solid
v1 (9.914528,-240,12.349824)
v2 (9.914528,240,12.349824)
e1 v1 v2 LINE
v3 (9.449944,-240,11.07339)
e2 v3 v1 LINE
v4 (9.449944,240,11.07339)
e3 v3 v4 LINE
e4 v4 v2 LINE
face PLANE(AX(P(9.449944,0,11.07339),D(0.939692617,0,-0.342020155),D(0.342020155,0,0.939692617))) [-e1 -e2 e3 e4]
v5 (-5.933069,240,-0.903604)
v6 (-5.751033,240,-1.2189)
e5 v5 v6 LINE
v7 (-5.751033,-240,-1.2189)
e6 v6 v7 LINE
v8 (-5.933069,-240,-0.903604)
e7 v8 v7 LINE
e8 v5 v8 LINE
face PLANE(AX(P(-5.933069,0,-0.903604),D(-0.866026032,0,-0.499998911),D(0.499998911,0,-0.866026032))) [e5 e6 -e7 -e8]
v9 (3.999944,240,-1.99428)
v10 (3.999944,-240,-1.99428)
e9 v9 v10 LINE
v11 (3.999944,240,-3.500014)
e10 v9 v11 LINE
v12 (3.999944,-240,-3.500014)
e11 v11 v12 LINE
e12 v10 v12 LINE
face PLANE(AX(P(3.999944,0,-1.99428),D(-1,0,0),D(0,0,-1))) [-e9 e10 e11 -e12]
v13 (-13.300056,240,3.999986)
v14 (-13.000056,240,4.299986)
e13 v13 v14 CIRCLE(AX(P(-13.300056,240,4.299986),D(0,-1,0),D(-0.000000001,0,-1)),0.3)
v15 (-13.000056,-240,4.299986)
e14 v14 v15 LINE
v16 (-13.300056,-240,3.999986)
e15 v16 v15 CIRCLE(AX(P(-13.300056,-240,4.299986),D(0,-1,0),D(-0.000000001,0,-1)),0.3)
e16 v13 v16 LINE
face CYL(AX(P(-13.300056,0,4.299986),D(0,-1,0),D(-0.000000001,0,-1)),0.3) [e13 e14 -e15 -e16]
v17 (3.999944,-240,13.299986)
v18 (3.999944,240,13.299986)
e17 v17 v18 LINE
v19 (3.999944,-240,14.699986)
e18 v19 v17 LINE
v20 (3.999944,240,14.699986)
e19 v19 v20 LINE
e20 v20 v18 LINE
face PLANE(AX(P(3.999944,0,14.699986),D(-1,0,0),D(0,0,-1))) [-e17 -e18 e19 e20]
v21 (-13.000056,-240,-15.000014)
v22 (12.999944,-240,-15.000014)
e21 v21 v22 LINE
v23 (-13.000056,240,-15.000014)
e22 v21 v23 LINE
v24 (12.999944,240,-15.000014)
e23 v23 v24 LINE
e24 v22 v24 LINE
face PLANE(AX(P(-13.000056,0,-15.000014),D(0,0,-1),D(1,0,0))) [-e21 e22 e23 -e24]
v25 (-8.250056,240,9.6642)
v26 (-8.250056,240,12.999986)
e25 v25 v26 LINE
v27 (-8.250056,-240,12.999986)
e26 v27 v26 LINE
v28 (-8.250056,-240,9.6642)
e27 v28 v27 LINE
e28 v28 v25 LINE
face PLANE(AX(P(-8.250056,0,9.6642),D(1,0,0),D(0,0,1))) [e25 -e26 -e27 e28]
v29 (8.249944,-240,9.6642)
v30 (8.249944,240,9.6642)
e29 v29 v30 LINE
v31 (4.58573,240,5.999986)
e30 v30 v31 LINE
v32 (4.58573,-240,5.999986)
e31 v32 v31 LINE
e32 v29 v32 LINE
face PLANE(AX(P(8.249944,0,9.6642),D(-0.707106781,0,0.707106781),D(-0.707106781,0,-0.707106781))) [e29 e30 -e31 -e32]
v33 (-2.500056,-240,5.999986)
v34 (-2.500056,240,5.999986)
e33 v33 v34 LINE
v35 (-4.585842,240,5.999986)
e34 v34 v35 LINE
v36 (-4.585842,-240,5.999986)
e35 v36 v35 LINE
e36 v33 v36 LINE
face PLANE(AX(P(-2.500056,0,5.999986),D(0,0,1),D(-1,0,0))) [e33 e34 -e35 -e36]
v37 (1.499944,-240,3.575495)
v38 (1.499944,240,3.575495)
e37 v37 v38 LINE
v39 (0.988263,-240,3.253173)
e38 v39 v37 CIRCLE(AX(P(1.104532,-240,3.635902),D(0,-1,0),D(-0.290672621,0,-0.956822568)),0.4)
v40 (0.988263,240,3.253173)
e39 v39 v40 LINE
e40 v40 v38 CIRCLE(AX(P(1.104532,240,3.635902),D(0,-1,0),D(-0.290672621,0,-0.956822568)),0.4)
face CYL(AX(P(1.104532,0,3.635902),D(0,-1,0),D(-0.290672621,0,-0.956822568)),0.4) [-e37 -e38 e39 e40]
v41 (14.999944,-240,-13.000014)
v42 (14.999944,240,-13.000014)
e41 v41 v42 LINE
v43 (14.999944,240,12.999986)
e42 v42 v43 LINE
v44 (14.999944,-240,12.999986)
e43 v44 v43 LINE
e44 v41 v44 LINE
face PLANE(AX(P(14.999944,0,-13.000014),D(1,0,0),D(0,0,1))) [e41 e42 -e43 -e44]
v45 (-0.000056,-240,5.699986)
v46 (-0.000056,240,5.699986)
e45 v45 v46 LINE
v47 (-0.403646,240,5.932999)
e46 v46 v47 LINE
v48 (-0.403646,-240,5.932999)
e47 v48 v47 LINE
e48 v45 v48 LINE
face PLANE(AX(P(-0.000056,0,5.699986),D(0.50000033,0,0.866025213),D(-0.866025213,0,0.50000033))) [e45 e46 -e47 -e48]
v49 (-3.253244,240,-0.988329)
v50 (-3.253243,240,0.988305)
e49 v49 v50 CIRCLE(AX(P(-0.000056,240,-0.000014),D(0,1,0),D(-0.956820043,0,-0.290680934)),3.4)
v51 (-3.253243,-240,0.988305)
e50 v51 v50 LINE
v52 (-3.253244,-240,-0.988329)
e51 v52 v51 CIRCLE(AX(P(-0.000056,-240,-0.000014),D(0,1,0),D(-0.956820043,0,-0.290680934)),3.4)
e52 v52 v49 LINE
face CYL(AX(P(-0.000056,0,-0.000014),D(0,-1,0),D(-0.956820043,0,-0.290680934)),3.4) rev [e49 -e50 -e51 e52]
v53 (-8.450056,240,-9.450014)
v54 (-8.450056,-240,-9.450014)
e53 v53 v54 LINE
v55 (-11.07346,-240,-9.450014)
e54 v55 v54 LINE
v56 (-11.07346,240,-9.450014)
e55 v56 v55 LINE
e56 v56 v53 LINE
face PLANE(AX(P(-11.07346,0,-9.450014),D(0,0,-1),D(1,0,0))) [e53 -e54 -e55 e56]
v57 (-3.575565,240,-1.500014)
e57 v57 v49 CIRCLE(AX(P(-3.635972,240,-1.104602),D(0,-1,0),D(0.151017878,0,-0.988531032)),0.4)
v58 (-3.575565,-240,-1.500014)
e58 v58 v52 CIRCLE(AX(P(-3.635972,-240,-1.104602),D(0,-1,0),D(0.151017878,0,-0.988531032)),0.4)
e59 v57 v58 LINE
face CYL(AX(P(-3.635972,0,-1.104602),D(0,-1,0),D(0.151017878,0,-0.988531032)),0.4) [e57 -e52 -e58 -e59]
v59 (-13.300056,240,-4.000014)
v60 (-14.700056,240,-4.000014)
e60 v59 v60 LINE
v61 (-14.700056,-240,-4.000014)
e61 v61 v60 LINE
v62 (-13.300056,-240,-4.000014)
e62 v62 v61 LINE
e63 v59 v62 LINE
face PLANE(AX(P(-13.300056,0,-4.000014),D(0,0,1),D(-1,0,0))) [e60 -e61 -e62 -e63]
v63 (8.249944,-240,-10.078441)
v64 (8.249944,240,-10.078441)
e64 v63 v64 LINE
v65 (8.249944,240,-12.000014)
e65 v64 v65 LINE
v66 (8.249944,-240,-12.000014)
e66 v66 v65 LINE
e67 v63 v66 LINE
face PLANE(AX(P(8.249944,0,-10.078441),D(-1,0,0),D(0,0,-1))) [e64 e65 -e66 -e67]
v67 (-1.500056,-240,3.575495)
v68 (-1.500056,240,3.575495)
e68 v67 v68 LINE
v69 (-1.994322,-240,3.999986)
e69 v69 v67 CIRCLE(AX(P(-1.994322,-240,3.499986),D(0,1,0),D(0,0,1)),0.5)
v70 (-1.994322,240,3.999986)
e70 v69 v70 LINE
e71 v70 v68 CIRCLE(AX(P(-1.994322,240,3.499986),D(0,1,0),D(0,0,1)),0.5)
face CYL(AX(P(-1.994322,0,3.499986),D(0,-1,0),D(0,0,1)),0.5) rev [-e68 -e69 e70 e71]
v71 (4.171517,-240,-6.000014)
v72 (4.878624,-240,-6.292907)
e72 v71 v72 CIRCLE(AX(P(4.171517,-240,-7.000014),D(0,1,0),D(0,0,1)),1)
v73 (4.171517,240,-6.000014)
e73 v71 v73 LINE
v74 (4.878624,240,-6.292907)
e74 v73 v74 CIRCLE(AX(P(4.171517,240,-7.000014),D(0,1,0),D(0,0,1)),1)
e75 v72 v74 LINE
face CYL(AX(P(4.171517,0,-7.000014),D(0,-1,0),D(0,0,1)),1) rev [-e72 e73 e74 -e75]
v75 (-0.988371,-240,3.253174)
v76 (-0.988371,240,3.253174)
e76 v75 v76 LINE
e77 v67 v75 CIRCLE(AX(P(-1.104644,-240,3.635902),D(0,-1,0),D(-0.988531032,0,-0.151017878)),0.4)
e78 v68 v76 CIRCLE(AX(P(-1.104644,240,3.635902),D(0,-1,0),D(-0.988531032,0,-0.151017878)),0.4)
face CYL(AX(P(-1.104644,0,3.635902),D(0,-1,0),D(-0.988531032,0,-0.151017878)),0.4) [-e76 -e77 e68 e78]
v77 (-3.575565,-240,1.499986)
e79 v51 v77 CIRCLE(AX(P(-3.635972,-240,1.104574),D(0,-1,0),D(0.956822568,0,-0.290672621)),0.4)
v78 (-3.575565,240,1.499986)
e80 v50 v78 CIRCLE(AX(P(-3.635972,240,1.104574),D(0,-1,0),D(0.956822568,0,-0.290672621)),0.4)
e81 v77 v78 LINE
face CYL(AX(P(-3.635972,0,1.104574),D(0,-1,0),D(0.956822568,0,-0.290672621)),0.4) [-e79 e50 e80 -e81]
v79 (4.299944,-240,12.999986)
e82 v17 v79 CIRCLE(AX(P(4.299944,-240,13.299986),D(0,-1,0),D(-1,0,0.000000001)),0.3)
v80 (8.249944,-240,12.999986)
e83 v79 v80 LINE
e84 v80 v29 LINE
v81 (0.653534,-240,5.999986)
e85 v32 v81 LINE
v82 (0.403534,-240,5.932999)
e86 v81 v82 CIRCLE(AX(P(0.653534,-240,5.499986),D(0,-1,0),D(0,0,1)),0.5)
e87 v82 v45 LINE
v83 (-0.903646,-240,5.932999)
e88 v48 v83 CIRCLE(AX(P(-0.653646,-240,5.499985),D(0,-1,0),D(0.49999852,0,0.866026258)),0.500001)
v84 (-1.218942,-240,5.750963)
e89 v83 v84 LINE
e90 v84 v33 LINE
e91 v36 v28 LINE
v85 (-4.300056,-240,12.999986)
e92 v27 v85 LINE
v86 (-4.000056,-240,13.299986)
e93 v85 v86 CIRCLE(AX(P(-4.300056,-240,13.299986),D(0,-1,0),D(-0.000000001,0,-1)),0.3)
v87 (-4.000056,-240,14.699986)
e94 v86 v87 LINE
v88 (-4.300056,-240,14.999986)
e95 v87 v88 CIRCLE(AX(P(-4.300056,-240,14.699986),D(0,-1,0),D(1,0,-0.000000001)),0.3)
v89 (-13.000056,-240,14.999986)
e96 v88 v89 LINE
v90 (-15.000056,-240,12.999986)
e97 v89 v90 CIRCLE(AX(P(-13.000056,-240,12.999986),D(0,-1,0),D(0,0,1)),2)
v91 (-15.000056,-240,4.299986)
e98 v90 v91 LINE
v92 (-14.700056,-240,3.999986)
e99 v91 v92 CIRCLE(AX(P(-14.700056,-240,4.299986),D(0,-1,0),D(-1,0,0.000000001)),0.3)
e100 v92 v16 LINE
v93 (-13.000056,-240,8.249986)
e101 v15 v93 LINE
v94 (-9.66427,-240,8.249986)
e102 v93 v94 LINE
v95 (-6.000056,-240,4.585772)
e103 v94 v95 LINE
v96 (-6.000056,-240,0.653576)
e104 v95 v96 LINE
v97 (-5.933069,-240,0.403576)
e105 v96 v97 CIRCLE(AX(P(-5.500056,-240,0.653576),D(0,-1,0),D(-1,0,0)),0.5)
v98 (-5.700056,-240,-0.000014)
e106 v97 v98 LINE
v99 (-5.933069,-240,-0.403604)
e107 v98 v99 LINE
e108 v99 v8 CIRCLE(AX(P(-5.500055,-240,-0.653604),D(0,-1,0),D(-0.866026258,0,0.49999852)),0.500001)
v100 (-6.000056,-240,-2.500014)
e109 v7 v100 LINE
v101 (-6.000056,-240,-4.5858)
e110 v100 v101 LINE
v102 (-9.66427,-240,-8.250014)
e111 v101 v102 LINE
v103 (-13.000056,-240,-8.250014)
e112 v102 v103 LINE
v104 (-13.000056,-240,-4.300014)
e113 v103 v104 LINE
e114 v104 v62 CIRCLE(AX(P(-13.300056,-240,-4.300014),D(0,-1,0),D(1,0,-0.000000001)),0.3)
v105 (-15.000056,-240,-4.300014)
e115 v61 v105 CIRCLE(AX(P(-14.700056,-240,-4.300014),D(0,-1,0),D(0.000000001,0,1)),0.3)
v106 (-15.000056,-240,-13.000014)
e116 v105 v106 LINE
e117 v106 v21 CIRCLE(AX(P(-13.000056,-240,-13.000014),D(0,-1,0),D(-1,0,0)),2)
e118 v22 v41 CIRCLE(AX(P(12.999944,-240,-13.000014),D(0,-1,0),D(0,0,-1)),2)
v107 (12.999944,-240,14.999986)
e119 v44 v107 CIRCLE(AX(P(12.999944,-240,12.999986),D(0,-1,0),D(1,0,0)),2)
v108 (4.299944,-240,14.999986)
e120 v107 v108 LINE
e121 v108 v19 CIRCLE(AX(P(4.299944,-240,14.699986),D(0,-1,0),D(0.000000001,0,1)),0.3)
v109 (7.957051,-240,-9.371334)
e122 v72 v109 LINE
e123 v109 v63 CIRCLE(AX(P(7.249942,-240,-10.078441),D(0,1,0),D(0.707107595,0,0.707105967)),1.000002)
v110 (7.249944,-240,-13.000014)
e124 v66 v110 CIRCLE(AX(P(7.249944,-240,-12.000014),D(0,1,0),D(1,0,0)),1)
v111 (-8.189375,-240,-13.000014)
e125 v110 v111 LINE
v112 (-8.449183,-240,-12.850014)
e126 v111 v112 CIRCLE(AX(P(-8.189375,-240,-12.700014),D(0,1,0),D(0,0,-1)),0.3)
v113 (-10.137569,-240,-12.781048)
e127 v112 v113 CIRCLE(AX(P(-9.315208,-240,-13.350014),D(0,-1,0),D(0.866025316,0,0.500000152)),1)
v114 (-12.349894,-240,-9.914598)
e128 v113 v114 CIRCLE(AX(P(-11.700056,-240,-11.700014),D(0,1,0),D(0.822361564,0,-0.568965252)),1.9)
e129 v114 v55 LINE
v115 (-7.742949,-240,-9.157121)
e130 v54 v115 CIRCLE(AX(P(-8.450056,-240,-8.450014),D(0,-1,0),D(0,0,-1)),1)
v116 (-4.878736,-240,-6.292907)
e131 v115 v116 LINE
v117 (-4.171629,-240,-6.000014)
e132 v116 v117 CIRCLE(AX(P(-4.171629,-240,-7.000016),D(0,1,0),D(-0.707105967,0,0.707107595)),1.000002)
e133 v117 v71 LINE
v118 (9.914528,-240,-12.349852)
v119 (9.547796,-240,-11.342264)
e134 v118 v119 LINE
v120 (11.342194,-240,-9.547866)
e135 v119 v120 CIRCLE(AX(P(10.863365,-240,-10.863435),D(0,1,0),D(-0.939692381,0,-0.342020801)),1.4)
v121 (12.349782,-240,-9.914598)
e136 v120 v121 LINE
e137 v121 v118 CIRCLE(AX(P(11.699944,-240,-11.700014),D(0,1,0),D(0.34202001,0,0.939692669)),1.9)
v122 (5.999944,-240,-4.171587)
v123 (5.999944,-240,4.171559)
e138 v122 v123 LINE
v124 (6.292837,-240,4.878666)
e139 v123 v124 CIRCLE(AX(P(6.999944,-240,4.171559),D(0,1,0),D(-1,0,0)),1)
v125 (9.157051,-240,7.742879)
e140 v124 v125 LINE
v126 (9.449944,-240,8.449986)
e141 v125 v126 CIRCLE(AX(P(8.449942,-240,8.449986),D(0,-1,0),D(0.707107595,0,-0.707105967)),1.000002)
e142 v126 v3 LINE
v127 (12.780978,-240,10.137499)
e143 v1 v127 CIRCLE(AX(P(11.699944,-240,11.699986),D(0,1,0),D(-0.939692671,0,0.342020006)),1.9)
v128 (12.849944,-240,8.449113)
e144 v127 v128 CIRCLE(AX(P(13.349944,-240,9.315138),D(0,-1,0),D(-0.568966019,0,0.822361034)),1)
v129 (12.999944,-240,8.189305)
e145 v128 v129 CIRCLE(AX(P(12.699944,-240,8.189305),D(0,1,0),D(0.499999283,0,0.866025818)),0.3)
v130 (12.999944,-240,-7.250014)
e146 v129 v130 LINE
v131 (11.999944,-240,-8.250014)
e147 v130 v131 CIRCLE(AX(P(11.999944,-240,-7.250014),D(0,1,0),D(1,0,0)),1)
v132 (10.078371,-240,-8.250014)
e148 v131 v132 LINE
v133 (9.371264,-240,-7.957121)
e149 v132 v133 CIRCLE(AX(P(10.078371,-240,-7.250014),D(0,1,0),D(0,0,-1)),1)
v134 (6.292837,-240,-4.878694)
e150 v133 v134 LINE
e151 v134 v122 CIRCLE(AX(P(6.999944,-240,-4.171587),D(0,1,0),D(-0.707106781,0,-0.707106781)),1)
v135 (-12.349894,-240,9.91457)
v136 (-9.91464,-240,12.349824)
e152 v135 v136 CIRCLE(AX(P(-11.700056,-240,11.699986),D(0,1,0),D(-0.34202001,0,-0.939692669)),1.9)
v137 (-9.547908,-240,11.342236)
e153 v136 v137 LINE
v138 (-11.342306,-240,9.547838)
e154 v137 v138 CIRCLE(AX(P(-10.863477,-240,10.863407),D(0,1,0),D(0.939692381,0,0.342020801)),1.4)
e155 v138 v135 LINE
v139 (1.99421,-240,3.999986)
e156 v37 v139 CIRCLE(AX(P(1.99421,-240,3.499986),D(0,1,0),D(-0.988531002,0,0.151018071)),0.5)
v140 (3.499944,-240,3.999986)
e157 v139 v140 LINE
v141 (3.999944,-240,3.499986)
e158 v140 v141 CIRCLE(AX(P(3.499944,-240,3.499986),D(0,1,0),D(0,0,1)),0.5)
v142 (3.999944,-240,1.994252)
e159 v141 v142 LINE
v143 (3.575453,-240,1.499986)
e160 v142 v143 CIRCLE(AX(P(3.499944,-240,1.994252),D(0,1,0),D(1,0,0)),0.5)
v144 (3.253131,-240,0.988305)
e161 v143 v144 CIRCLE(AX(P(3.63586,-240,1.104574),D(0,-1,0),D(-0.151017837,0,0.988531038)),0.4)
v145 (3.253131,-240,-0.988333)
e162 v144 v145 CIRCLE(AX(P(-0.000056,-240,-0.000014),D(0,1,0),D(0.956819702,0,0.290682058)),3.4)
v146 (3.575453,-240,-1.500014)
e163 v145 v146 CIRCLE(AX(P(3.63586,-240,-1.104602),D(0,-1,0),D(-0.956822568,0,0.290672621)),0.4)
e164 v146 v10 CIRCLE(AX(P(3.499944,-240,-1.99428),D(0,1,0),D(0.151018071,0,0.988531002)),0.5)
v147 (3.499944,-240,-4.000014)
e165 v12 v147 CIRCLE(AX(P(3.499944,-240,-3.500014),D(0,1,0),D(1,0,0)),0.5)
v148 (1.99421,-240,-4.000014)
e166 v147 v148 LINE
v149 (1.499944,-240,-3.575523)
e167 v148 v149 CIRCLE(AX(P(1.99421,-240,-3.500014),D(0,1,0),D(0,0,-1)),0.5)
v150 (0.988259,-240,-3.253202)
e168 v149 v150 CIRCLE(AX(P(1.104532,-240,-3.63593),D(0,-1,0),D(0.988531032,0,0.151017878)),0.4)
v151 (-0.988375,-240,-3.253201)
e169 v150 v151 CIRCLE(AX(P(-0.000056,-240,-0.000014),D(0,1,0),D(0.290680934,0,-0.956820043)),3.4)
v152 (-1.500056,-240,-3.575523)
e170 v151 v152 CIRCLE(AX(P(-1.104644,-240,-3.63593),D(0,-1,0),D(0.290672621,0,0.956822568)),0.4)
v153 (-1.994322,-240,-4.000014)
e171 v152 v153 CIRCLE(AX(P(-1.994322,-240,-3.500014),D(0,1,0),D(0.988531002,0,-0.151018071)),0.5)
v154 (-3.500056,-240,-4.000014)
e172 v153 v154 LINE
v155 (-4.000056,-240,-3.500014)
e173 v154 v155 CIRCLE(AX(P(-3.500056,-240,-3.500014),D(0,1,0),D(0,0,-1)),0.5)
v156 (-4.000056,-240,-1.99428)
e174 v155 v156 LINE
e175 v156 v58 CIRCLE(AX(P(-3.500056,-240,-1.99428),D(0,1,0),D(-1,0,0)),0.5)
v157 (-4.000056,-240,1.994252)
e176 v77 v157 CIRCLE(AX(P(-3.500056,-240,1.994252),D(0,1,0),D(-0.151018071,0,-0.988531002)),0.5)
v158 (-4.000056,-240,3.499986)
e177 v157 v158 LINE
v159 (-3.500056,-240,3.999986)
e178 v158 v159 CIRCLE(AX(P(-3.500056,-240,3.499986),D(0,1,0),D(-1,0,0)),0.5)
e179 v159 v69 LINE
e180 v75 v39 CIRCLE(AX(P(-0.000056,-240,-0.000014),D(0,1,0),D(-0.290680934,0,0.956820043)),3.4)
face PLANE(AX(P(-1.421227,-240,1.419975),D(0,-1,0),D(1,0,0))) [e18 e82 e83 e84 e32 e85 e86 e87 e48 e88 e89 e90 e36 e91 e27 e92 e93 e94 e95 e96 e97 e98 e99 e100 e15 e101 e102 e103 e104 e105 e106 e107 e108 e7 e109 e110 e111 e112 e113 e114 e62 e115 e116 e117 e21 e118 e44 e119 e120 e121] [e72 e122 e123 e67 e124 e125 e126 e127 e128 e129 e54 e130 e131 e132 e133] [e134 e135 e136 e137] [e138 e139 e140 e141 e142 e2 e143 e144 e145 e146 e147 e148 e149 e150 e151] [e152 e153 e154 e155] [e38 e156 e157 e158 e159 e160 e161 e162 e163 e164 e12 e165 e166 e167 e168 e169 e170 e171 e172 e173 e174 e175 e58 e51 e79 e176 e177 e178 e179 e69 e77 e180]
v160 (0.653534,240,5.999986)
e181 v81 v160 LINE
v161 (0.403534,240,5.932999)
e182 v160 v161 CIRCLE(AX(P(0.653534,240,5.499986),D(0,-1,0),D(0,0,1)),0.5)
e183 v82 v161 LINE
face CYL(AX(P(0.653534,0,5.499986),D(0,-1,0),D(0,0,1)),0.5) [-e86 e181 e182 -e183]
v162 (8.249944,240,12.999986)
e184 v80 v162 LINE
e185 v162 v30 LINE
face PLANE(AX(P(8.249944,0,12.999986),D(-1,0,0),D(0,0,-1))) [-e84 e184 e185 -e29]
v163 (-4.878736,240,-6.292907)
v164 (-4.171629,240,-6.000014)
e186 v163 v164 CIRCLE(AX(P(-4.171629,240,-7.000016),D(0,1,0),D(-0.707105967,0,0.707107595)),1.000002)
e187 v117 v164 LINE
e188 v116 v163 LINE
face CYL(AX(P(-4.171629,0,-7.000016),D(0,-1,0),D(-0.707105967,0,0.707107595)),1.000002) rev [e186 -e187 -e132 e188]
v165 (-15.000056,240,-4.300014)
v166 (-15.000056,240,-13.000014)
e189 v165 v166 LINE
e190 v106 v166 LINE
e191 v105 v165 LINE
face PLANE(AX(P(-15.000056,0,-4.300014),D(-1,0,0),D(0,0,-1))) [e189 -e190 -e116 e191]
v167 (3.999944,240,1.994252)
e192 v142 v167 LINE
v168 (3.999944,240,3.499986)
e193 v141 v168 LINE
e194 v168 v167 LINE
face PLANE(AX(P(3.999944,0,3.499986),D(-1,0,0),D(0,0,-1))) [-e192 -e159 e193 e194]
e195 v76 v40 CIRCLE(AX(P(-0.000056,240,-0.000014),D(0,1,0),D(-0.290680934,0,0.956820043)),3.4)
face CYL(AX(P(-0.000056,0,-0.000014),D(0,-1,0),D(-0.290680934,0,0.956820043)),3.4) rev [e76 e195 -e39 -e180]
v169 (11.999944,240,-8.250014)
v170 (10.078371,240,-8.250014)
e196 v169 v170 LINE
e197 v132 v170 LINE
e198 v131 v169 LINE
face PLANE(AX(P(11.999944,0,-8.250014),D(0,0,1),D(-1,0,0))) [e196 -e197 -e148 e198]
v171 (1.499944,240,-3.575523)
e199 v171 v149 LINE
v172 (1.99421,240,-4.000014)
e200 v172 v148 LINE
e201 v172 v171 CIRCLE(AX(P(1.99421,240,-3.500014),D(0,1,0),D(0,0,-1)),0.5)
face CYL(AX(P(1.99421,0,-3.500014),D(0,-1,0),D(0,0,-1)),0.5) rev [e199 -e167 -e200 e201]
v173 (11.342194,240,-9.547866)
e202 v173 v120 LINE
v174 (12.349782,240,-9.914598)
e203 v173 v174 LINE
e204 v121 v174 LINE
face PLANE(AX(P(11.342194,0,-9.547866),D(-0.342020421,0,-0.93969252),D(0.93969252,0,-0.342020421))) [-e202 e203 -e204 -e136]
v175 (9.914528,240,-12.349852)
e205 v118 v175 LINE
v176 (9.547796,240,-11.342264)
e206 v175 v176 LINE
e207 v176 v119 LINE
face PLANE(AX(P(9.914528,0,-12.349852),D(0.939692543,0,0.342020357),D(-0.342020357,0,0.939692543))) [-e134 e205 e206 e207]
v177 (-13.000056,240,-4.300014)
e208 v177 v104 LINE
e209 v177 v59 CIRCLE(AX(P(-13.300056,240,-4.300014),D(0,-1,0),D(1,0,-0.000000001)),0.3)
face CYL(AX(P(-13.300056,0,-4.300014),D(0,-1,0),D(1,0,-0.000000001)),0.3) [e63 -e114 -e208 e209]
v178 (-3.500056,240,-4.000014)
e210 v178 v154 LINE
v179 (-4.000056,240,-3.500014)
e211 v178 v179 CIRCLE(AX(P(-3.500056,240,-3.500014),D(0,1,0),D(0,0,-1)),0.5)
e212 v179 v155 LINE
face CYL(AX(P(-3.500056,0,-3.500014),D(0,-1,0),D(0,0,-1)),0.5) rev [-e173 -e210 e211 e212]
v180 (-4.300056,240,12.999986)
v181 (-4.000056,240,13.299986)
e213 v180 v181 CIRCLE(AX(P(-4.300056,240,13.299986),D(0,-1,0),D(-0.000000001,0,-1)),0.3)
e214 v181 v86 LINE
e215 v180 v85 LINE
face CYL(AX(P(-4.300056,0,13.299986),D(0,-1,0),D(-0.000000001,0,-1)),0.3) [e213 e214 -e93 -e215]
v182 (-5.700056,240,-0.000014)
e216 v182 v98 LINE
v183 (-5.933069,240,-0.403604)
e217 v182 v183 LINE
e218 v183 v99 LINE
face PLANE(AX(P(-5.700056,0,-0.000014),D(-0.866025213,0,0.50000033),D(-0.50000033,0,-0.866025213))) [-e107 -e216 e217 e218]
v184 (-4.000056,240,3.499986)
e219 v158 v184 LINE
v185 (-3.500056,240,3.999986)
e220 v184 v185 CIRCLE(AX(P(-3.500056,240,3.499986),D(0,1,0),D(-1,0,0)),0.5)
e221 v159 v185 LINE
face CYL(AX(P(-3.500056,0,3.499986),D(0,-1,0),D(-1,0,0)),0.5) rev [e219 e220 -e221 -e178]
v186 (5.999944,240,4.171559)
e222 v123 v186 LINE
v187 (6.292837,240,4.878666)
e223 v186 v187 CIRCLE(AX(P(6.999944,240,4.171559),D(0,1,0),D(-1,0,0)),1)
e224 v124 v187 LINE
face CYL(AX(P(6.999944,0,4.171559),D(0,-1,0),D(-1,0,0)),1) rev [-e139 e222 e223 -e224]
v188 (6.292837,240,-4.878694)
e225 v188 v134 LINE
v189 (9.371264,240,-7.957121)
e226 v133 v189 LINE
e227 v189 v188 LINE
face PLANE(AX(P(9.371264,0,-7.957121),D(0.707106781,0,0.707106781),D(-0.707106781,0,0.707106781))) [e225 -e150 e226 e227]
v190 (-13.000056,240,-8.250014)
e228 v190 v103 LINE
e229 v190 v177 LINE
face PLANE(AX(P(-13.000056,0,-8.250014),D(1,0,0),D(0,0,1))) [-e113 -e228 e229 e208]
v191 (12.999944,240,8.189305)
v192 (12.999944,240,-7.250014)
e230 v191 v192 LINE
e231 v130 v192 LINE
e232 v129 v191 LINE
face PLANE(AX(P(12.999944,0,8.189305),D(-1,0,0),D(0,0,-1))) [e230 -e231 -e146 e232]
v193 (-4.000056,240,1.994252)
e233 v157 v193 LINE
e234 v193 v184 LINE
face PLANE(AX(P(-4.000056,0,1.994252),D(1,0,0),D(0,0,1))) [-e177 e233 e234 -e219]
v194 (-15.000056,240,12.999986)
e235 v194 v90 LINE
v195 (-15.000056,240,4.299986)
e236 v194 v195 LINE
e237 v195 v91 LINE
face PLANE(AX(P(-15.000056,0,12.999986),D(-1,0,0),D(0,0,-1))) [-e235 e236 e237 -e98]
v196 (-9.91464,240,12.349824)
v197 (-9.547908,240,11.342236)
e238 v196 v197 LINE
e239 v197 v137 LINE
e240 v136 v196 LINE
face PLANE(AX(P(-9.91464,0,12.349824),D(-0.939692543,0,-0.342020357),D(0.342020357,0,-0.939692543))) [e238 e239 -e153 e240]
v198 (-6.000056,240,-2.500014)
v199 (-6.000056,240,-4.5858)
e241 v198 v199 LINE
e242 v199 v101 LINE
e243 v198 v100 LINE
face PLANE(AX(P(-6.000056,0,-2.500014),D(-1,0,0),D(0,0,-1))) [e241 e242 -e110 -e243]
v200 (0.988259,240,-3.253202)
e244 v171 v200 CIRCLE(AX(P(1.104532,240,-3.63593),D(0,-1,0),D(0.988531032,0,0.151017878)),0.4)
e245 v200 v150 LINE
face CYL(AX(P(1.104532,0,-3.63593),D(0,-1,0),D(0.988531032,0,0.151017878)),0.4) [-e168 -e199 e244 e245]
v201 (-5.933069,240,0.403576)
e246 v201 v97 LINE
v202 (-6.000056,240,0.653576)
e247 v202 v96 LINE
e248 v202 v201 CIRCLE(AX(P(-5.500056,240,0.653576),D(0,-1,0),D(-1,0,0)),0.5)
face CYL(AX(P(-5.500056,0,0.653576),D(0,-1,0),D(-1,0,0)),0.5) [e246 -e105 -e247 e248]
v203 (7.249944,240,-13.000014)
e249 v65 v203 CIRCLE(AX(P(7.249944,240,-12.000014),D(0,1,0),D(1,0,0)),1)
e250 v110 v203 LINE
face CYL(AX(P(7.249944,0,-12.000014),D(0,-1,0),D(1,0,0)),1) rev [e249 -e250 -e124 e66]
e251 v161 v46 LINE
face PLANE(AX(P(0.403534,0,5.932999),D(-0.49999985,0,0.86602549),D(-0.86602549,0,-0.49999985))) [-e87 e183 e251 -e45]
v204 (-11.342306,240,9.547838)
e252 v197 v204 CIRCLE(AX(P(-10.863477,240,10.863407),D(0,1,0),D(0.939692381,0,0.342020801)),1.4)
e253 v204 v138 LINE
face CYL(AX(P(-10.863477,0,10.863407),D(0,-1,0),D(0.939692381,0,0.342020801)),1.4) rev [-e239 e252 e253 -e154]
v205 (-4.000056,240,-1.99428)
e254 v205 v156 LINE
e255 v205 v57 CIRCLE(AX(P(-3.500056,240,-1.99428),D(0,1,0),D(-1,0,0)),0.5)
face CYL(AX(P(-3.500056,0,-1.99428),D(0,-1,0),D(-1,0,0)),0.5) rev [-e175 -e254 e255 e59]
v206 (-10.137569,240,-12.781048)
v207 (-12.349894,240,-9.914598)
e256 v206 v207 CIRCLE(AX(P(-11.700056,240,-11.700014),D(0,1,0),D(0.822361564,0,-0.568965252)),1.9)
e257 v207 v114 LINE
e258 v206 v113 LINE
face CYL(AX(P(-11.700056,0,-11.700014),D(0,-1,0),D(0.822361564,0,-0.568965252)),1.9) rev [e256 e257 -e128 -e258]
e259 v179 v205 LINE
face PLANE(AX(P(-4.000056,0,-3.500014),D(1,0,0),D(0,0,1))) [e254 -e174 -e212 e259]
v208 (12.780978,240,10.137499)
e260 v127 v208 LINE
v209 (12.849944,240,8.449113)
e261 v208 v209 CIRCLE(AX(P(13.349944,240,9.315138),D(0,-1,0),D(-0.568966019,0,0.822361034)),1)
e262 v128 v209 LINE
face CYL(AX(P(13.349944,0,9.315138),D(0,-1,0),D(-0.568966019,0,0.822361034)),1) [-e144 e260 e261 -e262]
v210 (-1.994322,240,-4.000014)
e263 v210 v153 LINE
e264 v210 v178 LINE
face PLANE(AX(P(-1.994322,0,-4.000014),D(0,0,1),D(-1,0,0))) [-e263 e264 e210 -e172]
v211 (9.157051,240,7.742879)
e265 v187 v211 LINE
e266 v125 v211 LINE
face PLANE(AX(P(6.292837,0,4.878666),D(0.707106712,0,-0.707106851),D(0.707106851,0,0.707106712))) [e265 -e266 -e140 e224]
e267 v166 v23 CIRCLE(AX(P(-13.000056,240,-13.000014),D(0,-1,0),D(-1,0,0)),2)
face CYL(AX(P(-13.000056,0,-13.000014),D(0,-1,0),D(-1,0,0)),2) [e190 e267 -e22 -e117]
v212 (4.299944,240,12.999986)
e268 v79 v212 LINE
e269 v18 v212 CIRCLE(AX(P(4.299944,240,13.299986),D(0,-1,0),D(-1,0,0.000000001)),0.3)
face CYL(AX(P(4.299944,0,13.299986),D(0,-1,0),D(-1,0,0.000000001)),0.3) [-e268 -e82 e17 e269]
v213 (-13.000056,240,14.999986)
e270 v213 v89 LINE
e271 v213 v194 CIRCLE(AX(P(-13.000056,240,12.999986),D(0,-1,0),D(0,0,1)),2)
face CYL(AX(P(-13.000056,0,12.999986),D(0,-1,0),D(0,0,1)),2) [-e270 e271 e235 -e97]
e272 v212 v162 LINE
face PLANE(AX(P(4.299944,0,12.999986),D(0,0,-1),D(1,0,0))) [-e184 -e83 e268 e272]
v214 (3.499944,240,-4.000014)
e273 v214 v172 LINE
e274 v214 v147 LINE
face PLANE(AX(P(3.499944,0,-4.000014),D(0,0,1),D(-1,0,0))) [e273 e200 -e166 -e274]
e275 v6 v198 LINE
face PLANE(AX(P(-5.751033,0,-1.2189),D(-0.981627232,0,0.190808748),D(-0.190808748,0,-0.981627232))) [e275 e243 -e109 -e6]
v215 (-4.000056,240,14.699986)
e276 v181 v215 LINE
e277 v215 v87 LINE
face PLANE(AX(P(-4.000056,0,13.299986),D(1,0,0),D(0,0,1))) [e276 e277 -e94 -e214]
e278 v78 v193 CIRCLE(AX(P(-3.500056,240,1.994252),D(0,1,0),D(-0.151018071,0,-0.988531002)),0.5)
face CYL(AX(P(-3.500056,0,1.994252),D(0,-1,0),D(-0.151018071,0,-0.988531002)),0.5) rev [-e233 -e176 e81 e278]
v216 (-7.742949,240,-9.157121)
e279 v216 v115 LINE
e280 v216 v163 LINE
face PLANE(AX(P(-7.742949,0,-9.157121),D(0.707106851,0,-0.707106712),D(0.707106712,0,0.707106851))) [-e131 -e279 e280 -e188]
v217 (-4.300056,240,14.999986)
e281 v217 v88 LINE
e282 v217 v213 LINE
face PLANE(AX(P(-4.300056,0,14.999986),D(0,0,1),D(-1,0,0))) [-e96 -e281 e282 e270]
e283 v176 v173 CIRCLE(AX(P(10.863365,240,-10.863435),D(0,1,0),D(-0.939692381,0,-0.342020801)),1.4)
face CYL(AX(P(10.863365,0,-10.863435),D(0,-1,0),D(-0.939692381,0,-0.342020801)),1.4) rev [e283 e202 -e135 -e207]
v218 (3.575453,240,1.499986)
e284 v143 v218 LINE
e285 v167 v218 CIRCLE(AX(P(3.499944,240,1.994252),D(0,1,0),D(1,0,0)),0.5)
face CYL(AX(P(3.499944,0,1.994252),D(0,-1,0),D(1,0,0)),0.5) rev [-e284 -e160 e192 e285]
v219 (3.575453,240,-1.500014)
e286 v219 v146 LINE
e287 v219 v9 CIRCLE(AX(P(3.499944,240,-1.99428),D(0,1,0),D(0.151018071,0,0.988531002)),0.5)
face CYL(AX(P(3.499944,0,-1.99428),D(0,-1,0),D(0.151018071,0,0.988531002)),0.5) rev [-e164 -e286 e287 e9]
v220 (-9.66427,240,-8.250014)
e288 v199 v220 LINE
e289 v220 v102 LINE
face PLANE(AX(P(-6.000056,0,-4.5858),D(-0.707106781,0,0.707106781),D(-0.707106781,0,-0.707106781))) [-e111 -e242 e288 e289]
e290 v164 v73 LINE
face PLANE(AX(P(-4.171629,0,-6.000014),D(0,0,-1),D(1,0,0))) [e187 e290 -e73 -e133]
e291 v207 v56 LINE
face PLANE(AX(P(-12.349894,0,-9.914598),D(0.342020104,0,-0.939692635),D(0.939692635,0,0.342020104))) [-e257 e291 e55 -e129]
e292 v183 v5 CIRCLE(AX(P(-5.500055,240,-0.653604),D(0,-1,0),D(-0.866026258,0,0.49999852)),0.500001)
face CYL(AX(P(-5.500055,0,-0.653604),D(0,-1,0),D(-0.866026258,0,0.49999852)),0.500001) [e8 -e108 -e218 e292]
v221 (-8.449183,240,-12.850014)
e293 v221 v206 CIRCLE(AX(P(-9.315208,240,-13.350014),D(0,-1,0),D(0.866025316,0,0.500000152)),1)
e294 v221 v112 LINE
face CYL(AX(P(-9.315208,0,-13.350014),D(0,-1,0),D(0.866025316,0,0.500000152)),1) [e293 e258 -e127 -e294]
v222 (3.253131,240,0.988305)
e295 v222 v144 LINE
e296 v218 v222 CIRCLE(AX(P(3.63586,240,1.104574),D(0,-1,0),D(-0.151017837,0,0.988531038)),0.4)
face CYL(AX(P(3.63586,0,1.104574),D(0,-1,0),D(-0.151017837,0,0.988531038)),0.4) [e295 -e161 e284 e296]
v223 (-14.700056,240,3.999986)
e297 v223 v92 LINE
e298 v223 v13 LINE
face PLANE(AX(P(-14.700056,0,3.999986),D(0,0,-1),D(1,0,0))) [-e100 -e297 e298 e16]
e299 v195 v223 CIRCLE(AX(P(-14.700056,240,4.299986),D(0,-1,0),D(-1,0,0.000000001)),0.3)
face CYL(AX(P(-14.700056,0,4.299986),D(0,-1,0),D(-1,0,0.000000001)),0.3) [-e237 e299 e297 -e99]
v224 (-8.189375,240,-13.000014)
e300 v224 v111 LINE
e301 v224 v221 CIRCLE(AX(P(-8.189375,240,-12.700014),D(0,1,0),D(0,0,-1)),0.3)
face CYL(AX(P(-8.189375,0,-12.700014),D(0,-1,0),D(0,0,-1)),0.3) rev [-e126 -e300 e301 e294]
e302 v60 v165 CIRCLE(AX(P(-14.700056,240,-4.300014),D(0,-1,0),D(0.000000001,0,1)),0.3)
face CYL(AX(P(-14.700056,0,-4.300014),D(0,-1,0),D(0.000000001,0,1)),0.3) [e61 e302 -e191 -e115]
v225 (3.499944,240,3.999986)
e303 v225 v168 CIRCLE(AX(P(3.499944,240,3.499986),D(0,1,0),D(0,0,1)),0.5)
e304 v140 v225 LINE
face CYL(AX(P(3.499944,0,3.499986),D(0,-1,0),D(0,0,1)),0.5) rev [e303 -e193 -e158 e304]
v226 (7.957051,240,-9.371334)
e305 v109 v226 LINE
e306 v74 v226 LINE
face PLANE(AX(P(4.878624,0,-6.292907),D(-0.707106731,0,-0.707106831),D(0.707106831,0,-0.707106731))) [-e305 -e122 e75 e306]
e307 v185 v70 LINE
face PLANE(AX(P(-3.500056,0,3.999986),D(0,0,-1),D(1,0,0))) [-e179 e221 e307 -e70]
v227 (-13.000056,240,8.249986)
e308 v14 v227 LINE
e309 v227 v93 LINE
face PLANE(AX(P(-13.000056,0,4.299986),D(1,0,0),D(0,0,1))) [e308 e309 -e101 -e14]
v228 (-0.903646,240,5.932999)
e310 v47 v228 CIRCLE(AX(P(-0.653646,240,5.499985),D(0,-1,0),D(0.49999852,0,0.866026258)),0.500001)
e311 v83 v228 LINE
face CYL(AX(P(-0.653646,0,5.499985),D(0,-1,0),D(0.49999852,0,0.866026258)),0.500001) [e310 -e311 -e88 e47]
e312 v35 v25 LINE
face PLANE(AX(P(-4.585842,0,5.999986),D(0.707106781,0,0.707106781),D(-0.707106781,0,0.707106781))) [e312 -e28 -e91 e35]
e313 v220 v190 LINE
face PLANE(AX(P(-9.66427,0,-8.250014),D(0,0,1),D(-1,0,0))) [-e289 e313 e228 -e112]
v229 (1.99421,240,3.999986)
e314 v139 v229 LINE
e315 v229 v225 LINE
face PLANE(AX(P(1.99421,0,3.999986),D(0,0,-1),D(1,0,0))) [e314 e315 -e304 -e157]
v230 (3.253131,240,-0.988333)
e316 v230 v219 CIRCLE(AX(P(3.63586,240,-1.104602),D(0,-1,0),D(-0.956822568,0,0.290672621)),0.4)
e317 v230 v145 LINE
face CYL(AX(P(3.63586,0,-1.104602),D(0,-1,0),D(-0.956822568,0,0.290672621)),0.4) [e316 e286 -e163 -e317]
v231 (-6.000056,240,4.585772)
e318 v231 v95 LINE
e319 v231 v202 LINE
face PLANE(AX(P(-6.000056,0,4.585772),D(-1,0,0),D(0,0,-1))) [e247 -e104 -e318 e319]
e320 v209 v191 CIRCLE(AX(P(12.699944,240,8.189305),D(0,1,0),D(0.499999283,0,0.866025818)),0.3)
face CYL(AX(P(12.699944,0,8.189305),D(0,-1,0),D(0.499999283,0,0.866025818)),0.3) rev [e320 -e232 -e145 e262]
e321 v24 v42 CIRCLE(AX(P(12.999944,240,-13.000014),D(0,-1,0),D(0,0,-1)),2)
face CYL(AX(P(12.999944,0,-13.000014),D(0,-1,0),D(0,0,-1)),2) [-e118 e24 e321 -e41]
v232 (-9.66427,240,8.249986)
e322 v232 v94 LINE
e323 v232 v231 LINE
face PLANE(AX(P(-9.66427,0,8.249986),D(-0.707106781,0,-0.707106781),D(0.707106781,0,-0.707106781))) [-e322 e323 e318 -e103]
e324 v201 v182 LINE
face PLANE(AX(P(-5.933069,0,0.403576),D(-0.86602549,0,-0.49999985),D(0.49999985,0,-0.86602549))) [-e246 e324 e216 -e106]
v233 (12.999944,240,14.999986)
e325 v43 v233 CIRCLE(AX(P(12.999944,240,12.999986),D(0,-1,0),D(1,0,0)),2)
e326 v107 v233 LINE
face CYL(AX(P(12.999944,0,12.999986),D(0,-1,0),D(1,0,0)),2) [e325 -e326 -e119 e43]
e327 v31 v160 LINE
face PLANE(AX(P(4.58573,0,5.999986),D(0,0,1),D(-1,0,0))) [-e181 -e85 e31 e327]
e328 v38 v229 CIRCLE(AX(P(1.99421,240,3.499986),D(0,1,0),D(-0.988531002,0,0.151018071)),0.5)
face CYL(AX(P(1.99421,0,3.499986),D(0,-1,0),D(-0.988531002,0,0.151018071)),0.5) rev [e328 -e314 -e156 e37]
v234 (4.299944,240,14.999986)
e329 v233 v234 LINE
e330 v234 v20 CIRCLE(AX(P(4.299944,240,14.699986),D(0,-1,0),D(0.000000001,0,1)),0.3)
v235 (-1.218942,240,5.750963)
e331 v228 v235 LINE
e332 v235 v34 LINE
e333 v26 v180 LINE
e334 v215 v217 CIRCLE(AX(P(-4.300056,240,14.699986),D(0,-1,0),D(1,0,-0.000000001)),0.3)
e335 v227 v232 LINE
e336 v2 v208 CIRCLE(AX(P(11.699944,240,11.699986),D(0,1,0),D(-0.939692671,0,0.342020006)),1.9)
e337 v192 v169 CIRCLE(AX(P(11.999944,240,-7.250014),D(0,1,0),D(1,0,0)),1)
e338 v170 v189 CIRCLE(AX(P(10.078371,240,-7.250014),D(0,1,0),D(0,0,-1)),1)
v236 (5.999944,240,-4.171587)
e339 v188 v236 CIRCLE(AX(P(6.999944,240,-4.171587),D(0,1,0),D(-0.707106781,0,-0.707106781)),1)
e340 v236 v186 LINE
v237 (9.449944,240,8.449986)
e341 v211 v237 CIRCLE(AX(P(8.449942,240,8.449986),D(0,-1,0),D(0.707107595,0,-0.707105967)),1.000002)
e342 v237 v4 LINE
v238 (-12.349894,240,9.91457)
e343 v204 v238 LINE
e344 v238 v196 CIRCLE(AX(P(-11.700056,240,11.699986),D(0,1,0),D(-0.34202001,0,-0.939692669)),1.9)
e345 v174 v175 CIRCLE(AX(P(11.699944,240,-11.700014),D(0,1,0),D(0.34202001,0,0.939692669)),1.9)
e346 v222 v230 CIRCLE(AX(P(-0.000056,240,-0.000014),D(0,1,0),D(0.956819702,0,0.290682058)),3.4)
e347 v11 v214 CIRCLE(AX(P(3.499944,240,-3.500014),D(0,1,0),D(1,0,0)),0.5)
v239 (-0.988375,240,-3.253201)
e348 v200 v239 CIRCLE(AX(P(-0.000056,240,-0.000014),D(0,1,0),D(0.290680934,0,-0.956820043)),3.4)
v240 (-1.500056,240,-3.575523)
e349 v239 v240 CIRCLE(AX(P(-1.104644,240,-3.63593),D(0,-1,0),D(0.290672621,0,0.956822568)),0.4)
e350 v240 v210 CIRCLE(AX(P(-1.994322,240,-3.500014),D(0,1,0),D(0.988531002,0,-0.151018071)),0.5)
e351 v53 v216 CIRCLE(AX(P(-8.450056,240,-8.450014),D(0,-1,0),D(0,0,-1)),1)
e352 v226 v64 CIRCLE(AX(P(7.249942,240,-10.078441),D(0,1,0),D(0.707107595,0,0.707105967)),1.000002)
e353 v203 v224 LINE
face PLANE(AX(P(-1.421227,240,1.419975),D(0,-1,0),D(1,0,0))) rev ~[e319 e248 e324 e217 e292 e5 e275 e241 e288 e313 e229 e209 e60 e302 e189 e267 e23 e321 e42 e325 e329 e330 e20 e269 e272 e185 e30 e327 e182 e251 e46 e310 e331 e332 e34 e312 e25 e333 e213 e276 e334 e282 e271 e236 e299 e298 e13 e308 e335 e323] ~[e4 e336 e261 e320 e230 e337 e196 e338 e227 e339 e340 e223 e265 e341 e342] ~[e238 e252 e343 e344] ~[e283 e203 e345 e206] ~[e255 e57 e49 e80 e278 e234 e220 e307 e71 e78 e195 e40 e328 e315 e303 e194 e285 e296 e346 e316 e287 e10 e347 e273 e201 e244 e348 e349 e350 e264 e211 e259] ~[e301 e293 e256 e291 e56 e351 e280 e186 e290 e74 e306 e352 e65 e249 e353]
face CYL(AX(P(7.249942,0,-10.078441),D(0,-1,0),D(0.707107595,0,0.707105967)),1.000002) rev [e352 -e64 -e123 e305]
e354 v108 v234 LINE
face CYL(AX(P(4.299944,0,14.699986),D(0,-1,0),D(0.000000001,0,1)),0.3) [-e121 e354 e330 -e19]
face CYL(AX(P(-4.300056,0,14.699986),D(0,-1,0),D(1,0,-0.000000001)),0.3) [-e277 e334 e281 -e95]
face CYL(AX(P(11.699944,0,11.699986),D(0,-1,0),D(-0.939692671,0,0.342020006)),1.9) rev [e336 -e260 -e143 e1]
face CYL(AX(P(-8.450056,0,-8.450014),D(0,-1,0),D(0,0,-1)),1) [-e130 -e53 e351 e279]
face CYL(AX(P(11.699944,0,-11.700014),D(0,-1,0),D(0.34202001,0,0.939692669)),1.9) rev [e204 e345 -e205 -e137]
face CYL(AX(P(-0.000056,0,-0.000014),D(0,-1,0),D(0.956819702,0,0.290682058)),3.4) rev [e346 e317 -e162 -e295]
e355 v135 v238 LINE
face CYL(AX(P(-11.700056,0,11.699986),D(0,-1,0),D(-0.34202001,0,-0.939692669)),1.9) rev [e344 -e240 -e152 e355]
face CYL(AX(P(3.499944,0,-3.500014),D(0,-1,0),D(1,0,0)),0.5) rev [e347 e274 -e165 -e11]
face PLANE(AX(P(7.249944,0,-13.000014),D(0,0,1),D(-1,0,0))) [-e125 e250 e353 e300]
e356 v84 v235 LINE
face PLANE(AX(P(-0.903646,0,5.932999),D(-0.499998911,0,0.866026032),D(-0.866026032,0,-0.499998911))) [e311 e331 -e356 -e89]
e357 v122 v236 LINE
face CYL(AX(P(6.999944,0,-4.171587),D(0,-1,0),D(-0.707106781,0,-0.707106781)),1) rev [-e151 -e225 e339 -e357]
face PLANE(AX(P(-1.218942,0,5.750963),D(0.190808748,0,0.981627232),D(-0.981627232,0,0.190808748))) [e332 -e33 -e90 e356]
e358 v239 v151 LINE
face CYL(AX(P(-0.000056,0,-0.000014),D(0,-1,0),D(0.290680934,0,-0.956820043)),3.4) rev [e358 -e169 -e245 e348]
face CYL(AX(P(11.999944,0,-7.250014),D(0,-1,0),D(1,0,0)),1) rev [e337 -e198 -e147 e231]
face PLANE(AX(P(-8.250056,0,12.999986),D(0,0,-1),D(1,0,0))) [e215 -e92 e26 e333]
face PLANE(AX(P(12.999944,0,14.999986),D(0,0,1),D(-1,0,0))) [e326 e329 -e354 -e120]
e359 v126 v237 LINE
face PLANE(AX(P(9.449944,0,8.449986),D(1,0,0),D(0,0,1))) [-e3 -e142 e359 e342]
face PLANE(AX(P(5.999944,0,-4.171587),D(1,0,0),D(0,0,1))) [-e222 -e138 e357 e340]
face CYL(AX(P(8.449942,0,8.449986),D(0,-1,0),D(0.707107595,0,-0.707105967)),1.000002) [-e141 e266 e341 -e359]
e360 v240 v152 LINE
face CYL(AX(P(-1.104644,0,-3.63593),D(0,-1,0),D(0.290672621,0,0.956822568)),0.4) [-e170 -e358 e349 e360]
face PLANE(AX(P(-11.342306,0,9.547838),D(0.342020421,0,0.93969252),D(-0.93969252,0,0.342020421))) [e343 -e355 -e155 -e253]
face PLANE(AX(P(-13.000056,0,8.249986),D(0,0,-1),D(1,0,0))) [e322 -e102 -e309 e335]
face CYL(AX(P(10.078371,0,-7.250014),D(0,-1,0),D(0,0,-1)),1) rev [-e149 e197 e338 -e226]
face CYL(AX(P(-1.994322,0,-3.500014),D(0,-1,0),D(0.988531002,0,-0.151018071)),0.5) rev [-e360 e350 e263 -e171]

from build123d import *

# Parameters (mm, degrees)
F2_DEPTH = 240


# Not quite as in the source:
# - ends of sketch curves that miss each other by under 0.0002 mm in the source are joined


with BuildPart() as f2:
    # F1 (on Front) → F2 (new body, symmetric)
    with BuildSketch(Plane.XZ):
        with BuildLine():
            Line((-8.250056, 12.999986), (-4.300056, 12.999986))
            ThreePointArc((-4.300056, 12.999986), (-4.0879239656, 13.0878539656), (-4.000056, 13.299986))
            Line((-4.000056, 13.299986), (-4.000056, 14.699986))
            ThreePointArc((-4.000056, 14.699986), (-4.0879239656, 14.9121180344), (-4.300056, 14.999986))
            Line((-4.300056, 14.999986), (-13.000056, 14.999986))
            ThreePointArc((-13.000056, 14.999986), (-14.4142695624, 14.4141995624), (-15.000056, 12.999986))
            Line((-15.000056, 12.999986), (-15.000056, 4.299986))
            ThreePointArc((-15.000056, 4.299986), (-14.9121880344, 4.0878539656), (-14.700056, 3.999986))
            Line((-14.700056, 3.999986), (-13.300056, 3.999986))
            ThreePointArc((-13.300056, 3.999986), (-13.0879239656, 4.0878539656), (-13.000056, 4.299986))
            Line((-13.000056, 4.299986), (-13.000056, 8.249986))
            Line((-13.000056, 8.249986), (-9.66427, 8.249986))
            Line((-9.66427, 8.249986), (-6.000056, 4.585772))
            Line((-6.000056, 4.585772), (-6.000056, 0.653576))
            ThreePointArc((-6.000056, 0.653576), (-5.9830189324, 0.5241665494), (-5.9330687764, 0.4035761291))
            Line((-5.9330687764, 0.4035761291), (-5.700056, -1.4e-05))
            Line((-5.700056, -1.4e-05), (-5.933069, -0.403604))
            ThreePointArc((-5.933069, -0.403604), (-6.000056, -0.653604), (-5.9330687764, -0.9036038709))
            Line((-5.9330687764, -0.9036038709), (-5.751033, -1.2189))
            Line((-5.751033, -1.2189), (-6.000056, -2.500014))
            Line((-6.000056, -2.500014), (-6.000056, -4.5858))
            Line((-6.000056, -4.5858), (-9.66427, -8.250014))
            Line((-9.66427, -8.250014), (-13.000056, -8.250014))
            Line((-13.000056, -8.250014), (-13.000056, -4.300014))
            ThreePointArc((-13.000056, -4.300014), (-13.0879239656, -4.0878819656), (-13.300056, -4.000014))
            Line((-13.300056, -4.000014), (-14.700056, -4.000014))
            ThreePointArc((-14.700056, -4.000014), (-14.9121880344, -4.0878819656), (-15.000056, -4.300014))
            Line((-15.000056, -4.300014), (-15.000056, -13.000014))
            ThreePointArc((-15.000056, -13.000014), (-14.4142695624, -14.4142275624), (-13.000056, -15.000014))
            Line((-13.000056, -15.000014), (12.999944, -15.000014))
            ThreePointArc((12.999944, -15.000014), (14.4141575624, -14.4142275624), (14.999944, -13.000014))
            Line((14.999944, -13.000014), (14.999944, 12.999986))
            ThreePointArc((14.999944, 12.999986), (14.4141575624, 14.4141995624), (12.999944, 14.999986))
            Line((12.999944, 14.999986), (4.299944, 14.999986))
            ThreePointArc((4.299944, 14.999986), (4.0878119656, 14.9121180344), (3.999944, 14.699986))
            Line((3.999944, 14.699986), (3.999944, 13.299986))
            ThreePointArc((3.999944, 13.299986), (4.0878119656, 13.0878539656), (4.299944, 12.999986))
            Line((4.299944, 12.999986), (8.249944, 12.999986))
            Line((8.249944, 12.999986), (8.249944, 9.6642))
            Line((8.249944, 9.6642), (4.58573, 5.999986))
            Line((4.58573, 5.999986), (0.653534, 5.999986))
            ThreePointArc((0.653534, 5.999986), (0.5241245494, 5.9829489324), (0.4035341291, 5.9329987764))
            Line((0.4035341291, 5.9329987764), (-5.6e-05, 5.699986))
            Line((-5.6e-05, 5.699986), (-0.403646, 5.932999))
            ThreePointArc((-0.403646, 5.932999), (-0.653646, 5.999986), (-0.9036458709, 5.9329987764))
            Line((-0.9036458709, 5.9329987764), (-1.218942, 5.750963))
            Line((-1.218942, 5.750963), (-2.500056, 5.999986))
            Line((-2.500056, 5.999986), (-4.585842, 5.999986))
            Line((-4.585842, 5.999986), (-8.250056, 9.6642))
            Line((-8.250056, 9.6642), (-8.250056, 12.999986))
        make_face()
        with BuildLine():
            ThreePointArc((-8.189375, -13.000014), (-8.339375082, -12.9598215738), (-8.4491827159, -12.8500138359))
            ThreePointArc((-8.4491827159, -12.8500138359), (-9.2743948384, -12.3508472042), (-10.1375690315, -12.7810479782))
            ThreePointArc((-10.1375690315, -12.7810479782), (-13.2041723505, -12.8608903949), (-12.3498940253, -9.9145979306))
            Line((-12.3498940253, -9.9145979306), (-11.07346, -9.450014))
            Line((-11.07346, -9.450014), (-8.450056, -9.450014))
            ThreePointArc((-8.450056, -9.450014), (-8.0673725676, -9.3738935325), (-7.7429492188, -9.1571207812))
            Line((-7.7429492188, -9.1571207812), (-4.878736, -6.292907))
            ThreePointArc((-4.878736, -6.292907), (-4.5543124324, -6.0761344675), (-4.171629, -6.000014))
            Line((-4.171629, -6.000014), (4.171517, -6.000014))
            ThreePointArc((4.171517, -6.000014), (4.5542004324, -6.0761344675), (4.8786237812, -6.2929072188))
            Line((4.8786237812, -6.2929072188), (7.957051, -9.371334))
            ThreePointArc((7.957051, -9.371334), (8.1738235325, -9.6957575676), (8.249944, -10.078441))
            Line((8.249944, -10.078441), (8.249944, -12.000014))
            ThreePointArc((8.249944, -12.000014), (7.9570507812, -12.7071207812), (7.249944, -13.000014))
            Line((7.249944, -13.000014), (-8.189375, -13.000014))
        make_face(mode=Mode.SUBTRACT)
        with BuildLine():
            ThreePointArc((9.5477956661, -11.3422641215), (9.8734155063, -9.8734855063), (11.3421941215, -9.5478656661))
            Line((11.3421941215, -9.5478656661), (12.349782, -9.914598))
            ThreePointArc((12.349782, -9.914598), (13.0434468843, -13.0435168843), (9.9145279306, -12.3498520253))
            Line((9.9145279306, -12.3498520253), (9.5477956661, -11.3422641215))
        make_face(mode=Mode.SUBTRACT)
        with BuildLine():
            ThreePointArc((-9.5479076661, 11.3422361215), (-9.8735275063, 9.8734575063), (-11.3423061215, 9.5478376661))
            Line((-11.3423061215, 9.5478376661), (-12.349894, 9.91457))
            ThreePointArc((-12.349894, 9.91457), (-13.0435588843, 13.0434888843), (-9.9146399306, 12.3498240253))
            Line((-9.9146399306, 12.3498240253), (-9.5479076661, 11.3422361215))
        make_face(mode=Mode.SUBTRACT)
        with BuildLine():
            ThreePointArc((3.2531309855, 0.9883049956), (3.399944, -1.4e-05), (3.2531309855, -0.9883329956))
            ThreePointArc((3.2531309855, -0.9883329956), (3.2974111593, -1.3177976431), (3.5754529349, -1.5000144258))
            ThreePointArc((3.5754529349, -1.5000144258), (3.8792555231, -1.6685151025), (3.999944, -1.99428))
            Line((3.999944, -1.99428), (3.999944, -3.500014))
            ThreePointArc((3.999944, -3.500014), (3.8534973906, -3.8535673906), (3.499944, -4.000014))
            Line((3.499944, -4.000014), (1.99421, -4.000014))
            ThreePointArc((1.99421, -4.000014), (1.6684451025, -3.8793255231), (1.4999444822, -3.5755229263))
            ThreePointArc((1.4999444822, -3.5755229263), (1.3177276431, -3.2974811593), (0.9882590481, -3.2532021585))
            ThreePointArc((0.9882590481, -3.2532021585), (-5.6e-05, -3.400014), (-0.9883749956, -3.2532009855))
            ThreePointArc((-0.9883749956, -3.2532009855), (-1.3178396431, -3.2974811593), (-1.5000564258, -3.5755229349))
            ThreePointArc((-1.5000564258, -3.5755229349), (-1.6685571025, -3.8793255231), (-1.994322, -4.000014))
            Line((-1.994322, -4.000014), (-3.500056, -4.000014))
            ThreePointArc((-3.500056, -4.000014), (-3.8536093906, -3.8535673906), (-4.000056, -3.500014))
            Line((-4.000056, -3.500014), (-4.000056, -1.99428))
            ThreePointArc((-4.000056, -1.99428), (-3.8793675231, -1.6685151025), (-3.5755649263, -1.5000144822))
            ThreePointArc((-3.5755649263, -1.5000144822), (-3.2975231593, -1.3177976431), (-3.2532441585, -0.9883290481))
            ThreePointArc((-3.2532441585, -0.9883290481), (-3.400056, -1.4e-05), (-3.2532429855, 0.9883049956))
            ThreePointArc((-3.2532429855, 0.9883049956), (-3.2975231593, 1.3177696431), (-3.5755649349, 1.4999864258))
            ThreePointArc((-3.5755649349, 1.4999864258), (-3.8793675231, 1.6684871025), (-4.000056, 1.994252))
            Line((-4.000056, 1.994252), (-4.000056, 3.499986))
            ThreePointArc((-4.000056, 3.499986), (-3.8536093906, 3.8535393906), (-3.500056, 3.999986))
            Line((-3.500056, 3.999986), (-1.994322, 3.999986))
            ThreePointArc((-1.994322, 3.999986), (-1.6685571025, 3.8792975231), (-1.5000564822, 3.5754949263))
            ThreePointArc((-1.5000564822, 3.5754949263), (-1.3178396431, 3.2974531593), (-0.9883710481, 3.2531741585))
            ThreePointArc((-0.9883710481, 3.2531741585), (-5.6e-05, 3.399986), (0.9882629956, 3.2531729855))
            ThreePointArc((0.9882629956, 3.2531729855), (1.3177276431, 3.2974531593), (1.4999444258, 3.5754949349))
            ThreePointArc((1.4999444258, 3.5754949349), (1.6684451025, 3.8792975231), (1.99421, 3.999986))
            Line((1.99421, 3.999986), (3.499944, 3.999986))
            ThreePointArc((3.499944, 3.999986), (3.8534973906, 3.8535393906), (3.999944, 3.499986))
            Line((3.999944, 3.499986), (3.999944, 1.994252))
            ThreePointArc((3.999944, 1.994252), (3.8792555231, 1.6684871025), (3.5754529263, 1.4999864822))
            ThreePointArc((3.5754529263, 1.4999864822), (3.2974111593, 1.3177696431), (3.2531309855, 0.9883049956))
        make_face(mode=Mode.SUBTRACT)
        with BuildLine():
            ThreePointArc((6.2928372188, -4.8786937812), (6.0760644675, -4.5542704324), (5.999944, -4.171587))
            Line((5.999944, -4.171587), (5.999944, 4.171559))
            ThreePointArc((5.999944, 4.171559), (6.0760644675, 4.5542424324), (6.2928372188, 4.8786657812))
            Line((6.2928372188, 4.8786657812), (9.157051, 7.742879))
            ThreePointArc((9.157051, 7.742879), (9.3738235325, 8.0673025676), (9.449944, 8.449986))
            Line((9.449944, 8.449986), (9.449944, 11.07339))
            Line((9.449944, 11.07339), (9.914528, 12.349824))
            ThreePointArc((9.914528, 12.349824), (12.8608203949, 13.2041023505), (12.7809779799, 10.1374990291))
            ThreePointArc((12.7809779799, 10.1374990291), (12.3507772042, 9.2743248384), (12.8499438252, 8.4491126972))
            ThreePointArc((12.8499438252, 8.4491126972), (12.9597515738, 8.339305082), (12.999944, 8.189305))
            Line((12.999944, 8.189305), (12.999944, -7.250014))
            ThreePointArc((12.999944, -7.250014), (12.7070507812, -7.9571207812), (11.999944, -8.250014))
            Line((11.999944, -8.250014), (10.078371, -8.250014))
            ThreePointArc((10.078371, -8.250014), (9.6956875676, -8.1738935325), (9.3712642188, -7.9571207812))
            Line((9.3712642188, -7.9571207812), (6.2928372188, -4.8786937812))
        make_face(mode=Mode.SUBTRACT)
    extrude(amount=F2_DEPTH, both=True)


solid = f2.part
